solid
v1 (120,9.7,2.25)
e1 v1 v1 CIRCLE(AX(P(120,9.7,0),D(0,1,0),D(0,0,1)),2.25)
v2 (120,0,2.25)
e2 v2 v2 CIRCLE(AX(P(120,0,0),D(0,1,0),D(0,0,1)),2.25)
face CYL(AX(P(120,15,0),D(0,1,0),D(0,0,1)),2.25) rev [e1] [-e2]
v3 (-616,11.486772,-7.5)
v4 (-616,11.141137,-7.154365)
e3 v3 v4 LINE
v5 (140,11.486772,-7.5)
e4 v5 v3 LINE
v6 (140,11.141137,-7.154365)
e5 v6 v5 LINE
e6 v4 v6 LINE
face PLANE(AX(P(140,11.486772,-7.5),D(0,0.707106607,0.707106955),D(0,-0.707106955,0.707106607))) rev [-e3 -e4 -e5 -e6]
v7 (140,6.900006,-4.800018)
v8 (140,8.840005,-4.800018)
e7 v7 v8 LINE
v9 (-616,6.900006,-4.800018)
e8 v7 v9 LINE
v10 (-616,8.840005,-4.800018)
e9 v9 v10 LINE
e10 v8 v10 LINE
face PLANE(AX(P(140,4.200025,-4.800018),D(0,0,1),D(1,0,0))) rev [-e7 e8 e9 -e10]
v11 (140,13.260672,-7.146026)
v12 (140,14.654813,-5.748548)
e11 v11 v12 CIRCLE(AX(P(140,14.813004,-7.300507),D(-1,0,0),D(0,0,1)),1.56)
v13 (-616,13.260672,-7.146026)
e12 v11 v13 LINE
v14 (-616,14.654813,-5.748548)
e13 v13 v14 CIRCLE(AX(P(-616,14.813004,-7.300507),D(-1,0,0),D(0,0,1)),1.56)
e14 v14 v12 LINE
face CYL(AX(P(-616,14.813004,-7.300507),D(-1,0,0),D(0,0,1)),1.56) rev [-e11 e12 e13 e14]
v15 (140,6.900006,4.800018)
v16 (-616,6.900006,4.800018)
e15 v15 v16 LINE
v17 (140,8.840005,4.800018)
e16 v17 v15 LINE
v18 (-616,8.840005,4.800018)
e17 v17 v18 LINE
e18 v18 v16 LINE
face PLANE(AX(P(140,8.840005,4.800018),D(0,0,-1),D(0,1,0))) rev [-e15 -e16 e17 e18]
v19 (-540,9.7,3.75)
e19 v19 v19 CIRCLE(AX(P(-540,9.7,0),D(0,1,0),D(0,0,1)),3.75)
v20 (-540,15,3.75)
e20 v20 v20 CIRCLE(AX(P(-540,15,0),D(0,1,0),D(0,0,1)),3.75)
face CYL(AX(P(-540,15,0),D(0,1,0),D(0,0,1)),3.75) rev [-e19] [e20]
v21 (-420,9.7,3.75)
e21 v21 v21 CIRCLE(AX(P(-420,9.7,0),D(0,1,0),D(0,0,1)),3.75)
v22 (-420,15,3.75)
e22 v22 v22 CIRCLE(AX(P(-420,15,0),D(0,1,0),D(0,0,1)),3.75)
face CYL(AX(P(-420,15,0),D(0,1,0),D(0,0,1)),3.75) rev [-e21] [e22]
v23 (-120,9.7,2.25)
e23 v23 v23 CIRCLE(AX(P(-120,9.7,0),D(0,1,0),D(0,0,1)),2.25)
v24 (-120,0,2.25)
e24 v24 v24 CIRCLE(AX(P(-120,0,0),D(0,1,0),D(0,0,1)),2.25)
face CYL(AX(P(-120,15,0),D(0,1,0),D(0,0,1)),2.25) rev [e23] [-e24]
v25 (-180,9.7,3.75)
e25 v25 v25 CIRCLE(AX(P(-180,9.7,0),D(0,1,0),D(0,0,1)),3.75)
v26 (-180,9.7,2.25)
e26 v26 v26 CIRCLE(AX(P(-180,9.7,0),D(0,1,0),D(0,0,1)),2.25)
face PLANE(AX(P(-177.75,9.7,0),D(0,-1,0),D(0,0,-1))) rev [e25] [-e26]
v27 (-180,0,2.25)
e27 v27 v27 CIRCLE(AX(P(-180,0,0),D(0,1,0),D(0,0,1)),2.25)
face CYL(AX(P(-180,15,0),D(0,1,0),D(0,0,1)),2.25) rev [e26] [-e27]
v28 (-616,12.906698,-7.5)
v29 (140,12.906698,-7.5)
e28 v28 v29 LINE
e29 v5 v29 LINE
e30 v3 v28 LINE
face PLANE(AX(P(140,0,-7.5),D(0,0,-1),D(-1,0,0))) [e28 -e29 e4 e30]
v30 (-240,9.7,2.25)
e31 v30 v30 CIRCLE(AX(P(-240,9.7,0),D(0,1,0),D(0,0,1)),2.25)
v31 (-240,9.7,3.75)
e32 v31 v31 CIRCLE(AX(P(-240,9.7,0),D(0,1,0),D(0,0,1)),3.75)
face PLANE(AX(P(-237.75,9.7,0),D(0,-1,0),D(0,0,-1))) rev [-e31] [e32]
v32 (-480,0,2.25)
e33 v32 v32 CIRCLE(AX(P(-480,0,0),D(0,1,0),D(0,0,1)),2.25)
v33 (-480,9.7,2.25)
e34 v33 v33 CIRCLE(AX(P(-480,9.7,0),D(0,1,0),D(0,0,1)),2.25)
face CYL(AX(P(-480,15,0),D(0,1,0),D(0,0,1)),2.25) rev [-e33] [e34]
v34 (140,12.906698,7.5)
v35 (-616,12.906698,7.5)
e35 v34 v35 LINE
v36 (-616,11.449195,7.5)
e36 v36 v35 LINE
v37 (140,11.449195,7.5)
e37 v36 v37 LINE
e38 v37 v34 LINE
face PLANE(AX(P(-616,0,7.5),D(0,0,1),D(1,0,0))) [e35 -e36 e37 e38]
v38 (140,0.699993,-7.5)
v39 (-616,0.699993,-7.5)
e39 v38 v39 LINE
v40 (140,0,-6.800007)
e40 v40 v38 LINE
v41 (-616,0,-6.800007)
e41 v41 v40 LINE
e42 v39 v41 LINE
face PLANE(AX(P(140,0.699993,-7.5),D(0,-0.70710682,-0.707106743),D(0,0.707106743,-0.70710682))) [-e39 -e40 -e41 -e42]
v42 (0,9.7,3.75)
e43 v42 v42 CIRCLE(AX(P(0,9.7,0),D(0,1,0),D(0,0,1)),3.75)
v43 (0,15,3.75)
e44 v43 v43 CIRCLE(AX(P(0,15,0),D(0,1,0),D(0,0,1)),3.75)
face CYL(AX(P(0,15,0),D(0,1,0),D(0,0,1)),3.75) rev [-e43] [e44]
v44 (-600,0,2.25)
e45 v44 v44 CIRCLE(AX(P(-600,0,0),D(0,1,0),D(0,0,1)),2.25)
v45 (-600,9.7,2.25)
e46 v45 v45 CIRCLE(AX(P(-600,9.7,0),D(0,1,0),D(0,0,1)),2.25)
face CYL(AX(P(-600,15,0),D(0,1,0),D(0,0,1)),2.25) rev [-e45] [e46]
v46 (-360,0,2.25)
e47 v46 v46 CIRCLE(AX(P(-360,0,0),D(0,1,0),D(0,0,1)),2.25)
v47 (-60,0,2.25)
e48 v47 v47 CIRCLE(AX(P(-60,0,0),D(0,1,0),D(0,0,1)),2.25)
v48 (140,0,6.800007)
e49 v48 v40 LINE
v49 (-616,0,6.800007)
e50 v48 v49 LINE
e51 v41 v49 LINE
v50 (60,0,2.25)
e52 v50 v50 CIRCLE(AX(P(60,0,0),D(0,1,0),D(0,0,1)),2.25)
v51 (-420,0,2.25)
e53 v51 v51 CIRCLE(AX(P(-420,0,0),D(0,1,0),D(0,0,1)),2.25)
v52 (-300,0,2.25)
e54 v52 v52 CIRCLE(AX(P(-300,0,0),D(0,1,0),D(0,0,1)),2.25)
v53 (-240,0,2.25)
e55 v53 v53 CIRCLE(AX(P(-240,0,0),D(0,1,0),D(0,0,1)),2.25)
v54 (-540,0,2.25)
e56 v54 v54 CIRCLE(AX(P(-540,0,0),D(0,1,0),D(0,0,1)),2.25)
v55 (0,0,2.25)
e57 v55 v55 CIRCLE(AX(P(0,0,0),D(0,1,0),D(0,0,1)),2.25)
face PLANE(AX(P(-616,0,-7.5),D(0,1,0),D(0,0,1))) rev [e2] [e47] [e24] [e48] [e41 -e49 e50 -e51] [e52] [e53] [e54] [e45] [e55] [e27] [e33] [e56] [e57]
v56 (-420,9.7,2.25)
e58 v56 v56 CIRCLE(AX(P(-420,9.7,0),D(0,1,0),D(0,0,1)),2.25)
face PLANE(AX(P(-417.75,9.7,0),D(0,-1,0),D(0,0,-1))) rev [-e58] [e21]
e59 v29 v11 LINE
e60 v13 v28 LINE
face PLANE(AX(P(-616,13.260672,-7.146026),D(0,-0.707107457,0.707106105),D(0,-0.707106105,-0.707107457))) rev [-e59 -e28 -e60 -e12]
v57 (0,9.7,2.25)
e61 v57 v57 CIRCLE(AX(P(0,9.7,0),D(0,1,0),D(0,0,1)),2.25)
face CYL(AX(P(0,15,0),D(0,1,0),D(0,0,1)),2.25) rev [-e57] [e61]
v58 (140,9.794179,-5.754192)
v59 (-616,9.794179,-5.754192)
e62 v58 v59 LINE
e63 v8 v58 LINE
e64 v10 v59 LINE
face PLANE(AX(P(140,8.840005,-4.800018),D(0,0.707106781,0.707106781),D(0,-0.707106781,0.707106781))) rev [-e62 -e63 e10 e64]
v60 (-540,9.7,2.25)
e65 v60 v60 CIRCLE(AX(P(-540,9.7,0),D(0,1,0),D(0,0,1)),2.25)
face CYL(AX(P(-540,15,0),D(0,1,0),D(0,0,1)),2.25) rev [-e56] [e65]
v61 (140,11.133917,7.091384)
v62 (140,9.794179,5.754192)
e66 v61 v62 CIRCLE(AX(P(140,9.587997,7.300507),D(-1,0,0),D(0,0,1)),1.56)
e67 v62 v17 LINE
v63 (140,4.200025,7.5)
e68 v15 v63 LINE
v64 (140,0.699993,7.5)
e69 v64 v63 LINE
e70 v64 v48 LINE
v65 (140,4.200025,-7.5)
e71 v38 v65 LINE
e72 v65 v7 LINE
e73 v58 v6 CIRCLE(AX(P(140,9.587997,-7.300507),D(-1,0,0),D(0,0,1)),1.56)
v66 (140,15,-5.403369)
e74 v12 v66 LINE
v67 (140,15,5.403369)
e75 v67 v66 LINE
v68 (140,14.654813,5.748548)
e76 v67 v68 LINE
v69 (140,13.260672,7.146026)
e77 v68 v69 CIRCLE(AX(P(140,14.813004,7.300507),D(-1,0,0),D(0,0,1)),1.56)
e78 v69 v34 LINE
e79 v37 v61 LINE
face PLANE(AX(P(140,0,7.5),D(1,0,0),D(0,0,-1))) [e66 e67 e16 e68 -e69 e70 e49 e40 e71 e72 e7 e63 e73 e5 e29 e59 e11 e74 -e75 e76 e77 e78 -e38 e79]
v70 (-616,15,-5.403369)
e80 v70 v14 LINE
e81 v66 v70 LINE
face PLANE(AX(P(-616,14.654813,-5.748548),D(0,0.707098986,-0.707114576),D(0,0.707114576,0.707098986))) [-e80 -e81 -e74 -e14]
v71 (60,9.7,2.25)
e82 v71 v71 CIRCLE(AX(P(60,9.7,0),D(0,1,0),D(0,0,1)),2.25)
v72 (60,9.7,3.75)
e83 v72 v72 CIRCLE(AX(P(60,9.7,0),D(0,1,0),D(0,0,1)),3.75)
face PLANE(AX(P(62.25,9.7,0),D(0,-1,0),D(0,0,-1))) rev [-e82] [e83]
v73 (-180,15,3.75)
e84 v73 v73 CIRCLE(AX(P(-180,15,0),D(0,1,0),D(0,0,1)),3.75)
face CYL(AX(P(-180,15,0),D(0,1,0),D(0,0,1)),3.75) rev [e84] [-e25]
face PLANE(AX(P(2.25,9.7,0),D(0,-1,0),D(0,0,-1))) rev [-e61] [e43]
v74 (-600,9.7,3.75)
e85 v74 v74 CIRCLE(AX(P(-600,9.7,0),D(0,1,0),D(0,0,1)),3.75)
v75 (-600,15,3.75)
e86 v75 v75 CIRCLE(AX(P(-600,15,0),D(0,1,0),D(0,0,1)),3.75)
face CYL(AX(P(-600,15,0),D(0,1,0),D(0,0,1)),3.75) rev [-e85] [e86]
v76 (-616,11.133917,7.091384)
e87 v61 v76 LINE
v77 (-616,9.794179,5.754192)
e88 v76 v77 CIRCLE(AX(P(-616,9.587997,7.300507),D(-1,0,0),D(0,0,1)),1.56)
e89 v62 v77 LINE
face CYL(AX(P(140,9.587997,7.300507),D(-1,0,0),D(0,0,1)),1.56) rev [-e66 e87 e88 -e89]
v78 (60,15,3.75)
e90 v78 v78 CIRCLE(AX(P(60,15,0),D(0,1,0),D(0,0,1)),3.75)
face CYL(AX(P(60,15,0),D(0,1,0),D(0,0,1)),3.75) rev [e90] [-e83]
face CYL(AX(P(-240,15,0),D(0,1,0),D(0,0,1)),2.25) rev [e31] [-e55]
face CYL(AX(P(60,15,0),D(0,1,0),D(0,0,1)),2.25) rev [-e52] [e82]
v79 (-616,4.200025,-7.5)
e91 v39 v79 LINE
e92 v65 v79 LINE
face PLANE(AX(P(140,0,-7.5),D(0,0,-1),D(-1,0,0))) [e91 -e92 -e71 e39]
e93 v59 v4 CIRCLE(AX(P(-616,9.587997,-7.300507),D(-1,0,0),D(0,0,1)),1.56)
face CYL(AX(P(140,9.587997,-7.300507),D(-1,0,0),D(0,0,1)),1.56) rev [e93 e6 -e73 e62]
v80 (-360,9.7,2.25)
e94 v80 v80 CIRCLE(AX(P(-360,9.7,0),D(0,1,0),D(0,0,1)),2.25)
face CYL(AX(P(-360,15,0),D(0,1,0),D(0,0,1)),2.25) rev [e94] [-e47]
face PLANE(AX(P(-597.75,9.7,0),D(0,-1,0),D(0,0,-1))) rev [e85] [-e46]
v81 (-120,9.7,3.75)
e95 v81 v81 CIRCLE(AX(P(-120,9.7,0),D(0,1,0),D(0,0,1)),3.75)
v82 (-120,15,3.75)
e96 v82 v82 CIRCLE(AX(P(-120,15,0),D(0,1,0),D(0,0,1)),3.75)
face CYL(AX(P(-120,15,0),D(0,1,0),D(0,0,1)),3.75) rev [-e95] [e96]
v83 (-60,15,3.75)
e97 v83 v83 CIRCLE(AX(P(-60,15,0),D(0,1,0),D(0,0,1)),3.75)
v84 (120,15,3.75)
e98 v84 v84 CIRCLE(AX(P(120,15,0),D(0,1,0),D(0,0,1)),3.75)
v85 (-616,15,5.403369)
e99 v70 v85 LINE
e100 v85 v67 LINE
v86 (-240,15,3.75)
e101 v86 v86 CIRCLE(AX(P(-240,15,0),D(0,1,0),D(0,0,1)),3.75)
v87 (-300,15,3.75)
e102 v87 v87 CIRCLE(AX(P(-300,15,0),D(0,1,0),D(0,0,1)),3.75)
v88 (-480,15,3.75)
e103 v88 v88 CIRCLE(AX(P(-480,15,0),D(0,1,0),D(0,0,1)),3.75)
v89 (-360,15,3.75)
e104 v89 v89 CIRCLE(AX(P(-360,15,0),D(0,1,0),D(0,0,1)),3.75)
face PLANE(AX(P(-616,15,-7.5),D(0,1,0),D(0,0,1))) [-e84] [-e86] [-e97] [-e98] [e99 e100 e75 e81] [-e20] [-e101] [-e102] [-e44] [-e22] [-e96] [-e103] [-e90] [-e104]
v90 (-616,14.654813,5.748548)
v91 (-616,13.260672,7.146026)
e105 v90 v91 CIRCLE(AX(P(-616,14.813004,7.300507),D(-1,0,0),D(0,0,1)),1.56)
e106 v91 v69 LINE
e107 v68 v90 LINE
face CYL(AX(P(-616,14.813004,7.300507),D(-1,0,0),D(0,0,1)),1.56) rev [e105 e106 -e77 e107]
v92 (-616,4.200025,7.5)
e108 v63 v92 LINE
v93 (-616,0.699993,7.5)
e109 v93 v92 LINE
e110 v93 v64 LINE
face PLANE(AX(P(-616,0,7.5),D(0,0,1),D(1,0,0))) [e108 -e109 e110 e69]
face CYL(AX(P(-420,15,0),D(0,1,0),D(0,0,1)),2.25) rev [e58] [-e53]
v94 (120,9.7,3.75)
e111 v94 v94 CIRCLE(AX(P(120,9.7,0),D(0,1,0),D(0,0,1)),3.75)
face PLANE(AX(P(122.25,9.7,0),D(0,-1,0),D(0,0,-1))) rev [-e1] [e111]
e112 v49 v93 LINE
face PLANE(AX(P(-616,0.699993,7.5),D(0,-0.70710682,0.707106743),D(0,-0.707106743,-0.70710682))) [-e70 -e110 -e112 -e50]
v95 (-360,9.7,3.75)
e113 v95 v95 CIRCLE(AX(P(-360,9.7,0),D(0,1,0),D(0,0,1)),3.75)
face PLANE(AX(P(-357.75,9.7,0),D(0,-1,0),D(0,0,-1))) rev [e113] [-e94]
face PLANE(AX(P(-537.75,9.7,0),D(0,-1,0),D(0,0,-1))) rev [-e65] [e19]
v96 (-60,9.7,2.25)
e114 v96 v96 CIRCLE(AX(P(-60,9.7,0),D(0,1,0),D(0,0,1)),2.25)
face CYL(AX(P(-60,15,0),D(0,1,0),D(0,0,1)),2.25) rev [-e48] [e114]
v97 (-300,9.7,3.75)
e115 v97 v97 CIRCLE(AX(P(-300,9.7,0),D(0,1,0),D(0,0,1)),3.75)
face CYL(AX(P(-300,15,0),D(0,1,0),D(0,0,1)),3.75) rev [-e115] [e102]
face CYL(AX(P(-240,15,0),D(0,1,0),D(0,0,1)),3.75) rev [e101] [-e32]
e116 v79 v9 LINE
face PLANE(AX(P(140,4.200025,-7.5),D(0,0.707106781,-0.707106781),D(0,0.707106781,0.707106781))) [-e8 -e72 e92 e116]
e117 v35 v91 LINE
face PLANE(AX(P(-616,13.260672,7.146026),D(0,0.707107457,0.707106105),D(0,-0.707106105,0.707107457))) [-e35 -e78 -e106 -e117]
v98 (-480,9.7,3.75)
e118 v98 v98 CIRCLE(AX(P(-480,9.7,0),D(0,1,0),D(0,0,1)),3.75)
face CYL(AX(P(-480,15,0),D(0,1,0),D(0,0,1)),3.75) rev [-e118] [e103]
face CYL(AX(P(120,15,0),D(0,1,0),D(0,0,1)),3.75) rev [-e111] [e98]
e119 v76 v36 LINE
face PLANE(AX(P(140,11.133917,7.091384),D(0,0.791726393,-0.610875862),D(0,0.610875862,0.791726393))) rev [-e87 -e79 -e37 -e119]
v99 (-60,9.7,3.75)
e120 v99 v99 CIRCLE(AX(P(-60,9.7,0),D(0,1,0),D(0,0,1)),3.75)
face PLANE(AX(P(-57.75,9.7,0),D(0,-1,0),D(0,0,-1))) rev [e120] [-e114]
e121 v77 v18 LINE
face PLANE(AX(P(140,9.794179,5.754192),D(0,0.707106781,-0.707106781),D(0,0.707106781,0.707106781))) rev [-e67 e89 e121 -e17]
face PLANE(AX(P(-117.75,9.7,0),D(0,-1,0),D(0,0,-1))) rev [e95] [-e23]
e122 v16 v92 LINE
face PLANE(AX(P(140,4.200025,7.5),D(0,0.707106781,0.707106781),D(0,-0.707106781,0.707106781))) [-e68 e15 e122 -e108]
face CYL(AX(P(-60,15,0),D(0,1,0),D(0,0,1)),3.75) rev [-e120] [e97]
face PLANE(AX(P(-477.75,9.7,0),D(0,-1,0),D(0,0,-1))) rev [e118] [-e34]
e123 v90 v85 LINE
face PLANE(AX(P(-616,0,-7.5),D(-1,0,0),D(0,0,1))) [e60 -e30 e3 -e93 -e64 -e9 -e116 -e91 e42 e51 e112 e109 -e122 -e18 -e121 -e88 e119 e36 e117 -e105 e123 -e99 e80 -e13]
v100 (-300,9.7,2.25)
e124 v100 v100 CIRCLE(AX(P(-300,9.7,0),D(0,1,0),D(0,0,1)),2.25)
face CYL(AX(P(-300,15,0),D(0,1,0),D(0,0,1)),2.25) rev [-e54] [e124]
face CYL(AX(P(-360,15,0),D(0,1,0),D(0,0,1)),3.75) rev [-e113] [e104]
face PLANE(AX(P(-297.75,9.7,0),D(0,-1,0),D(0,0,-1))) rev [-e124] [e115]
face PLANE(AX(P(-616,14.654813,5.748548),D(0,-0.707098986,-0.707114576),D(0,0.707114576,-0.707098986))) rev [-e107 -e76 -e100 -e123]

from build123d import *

# Parameters (mm, degrees)
SKETCH1_W                                        = 756
SKETCH1_H                                        = 15
BOSS_EXTRUDE1_DEPTH                              = 15
CUT_EXTRUDE1_DEPTH                               = 757.185989027
CUT_EXTRUDE2_DEPTH                               = 757.185989027
DRAFT1_ANGLE                                     = 45
DRAFT2_ANGLE                                     = 45
HOLE1_D                                          = 3.1199998
CBORE_FOR_M4_HEX_HEAD_MACHINE_SCREW1_D           = 4.5
CBORE_FOR_M4_HEX_HEAD_MACHINE_SCREW1_CBORE_D     = 7.5
CBORE_FOR_M4_HEX_HEAD_MACHINE_SCREW1_CBORE_DEPTH = 5.3
CHAMFER1_SIZE                                    = 0.359114068
CHAMFER2_SIZE                                    = 0.351583128
CHAMFER2_SIZE_2                                  = 0.314005893
CHAMFER3_SIZE                                    = 0.348386014
CHAMFER4_SIZE                                    = 0.699992786
CHAMFER4_SIZE2                                   = 0.69999271
CHAMFER5_SIZE                                    = 0.69999271
CHAMFER5_SIZE2                                   = 0.699992786


with BuildPart() as part:
    # Sketch1 → Boss-Extrude1 (new body)
    with BuildSketch(Plane(origin=(0, 15, 0), x_dir=(-1, 0, 0), z_dir=(0, 1, 0))):
        with Locations((238, 0)):
            Rectangle(SKETCH1_W, SKETCH1_H)
    extrude(amount=-BOSS_EXTRUDE1_DEPTH)

    # Sketch2 → Cut-Extrude1 (cut, through all)
    with BuildSketch(Plane.ZY.offset(616)):
        with BuildLine():
            Line((-7.5, 11.135189072), (-7.5, 4.2000246))
            Line((-7.5, 4.2000246), (-4.8000183, 4.2000246))
            Line((-4.8000183, 4.2000246), (-4.8000183, 8.8400054))
            Line((-4.8000183, 8.8400054), (-5.754192018, 9.794179118))
            ThreePointArc((-5.754192018, 9.794179118), (-6.350212567, 10.82514773), (-7.5, 11.135189072))
        make_face()
    extrude(amount=-CUT_EXTRUDE1_DEPTH, mode=Mode.SUBTRACT)

    # Sketch3 → Cut-Extrude2 (cut, through all)
    with BuildSketch(Plane.ZY.offset(616)):
        with BuildLine():
            Line((7.5, 4.2000246), (7.5, 11.135189072))
            ThreePointArc((7.5, 11.135189072), (6.350212567, 10.82514773), (5.754192018, 9.794179118))
            Line((5.754192018, 9.794179118), (4.8000183, 8.8400054))
            Line((4.8000183, 8.8400054), (4.8000183, 4.2000246))
            Line((4.8000183, 4.2000246), (7.5, 4.2000246))
        make_face()
    extrude(amount=-CUT_EXTRUDE2_DEPTH, mode=Mode.SUBTRACT)

    # Draft1
    draft1_faces = [part.faces().sort_by_distance(p)[0] for p in [
        (-238, 4.2000246, -6.15000915),
    ]]
    draft(draft1_faces, Plane(origin=(140, 0, -7.5), x_dir=(-1, 0, 0), z_dir=(0, 0, -1)), DRAFT1_ANGLE)

    # Draft2
    draft2_faces = [part.faces().sort_by_distance(p)[0] for p in [
        (-238, 4.2000246, 6.15000915),
    ]]
    draft(draft2_faces, Plane(origin=(-616, 0, 7.5), x_dir=(1, 0, 0), z_dir=(0, 0, 1)), DRAFT2_ANGLE)

    # Hole1 (through all)
    with Locations(Plane.ZY.offset(616)):
        with Locations((-7.3005066, 14.813004), (7.3005066, 14.813004)):
            Hole(HOLE1_D / 2)

    # CBORE for M4 Hex Head Machine Screw1 (through all)
    with Locations(Plane(origin=(0, 15, 0), x_dir=(-1, 0, 0), z_dir=(0, 1, 0))):
        with Locations((-60, 0), (-120, 0), (0, 0), (60, 0), (120, 0), (180, 0), (240, 0), (300, 0), (360, 0), (420, 0), (480, 0), (540, 0), (600, 0)):
            CounterBoreHole(CBORE_FOR_M4_HEX_HEAD_MACHINE_SCREW1_D / 2, CBORE_FOR_M4_HEX_HEAD_MACHINE_SCREW1_CBORE_D / 2, CBORE_FOR_M4_HEX_HEAD_MACHINE_SCREW1_CBORE_DEPTH)

    # Chamfer1
    # the kernel refuses this chamfer: 0.359114068, 0.320732608 mm, written as the material it takes off along each edge
    with BuildSketch(Plane(origin=(-616.923527515, 13.265812328, 7.5), x_dir=(0, -1, 0), z_dir=(1, 0, 0))) as chamfer1_piece_1:
        with BuildLine():
            Line((CHAMFER1_SIZE * 0.99999999892, 0), (0.005140565, 0.353974179))
            ThreePointArc((0.005140565, 0.353974179), (0.01270895, 0.181894047), (0, 0))
            Line((0, 0), (CHAMFER1_SIZE * 0.99999999892, 0))
        make_face()
    extrude(amount=757.84705503, mode=Mode.SUBTRACT)
    with BuildSketch(Plane(origin=(-616.923527515, 13.265812328, -7.5), x_dir=(0, -0.014520899519340609, 0.9998945661804294), z_dir=(1, 0, 0))) as chamfer1_piece_2:
        with BuildLine():
            Line((0.354011504, 0), (CHAMFER1_SIZE * 0.0145208995037, CHAMFER1_SIZE * 0.999894565101))
            Line((CHAMFER1_SIZE * 0.0145208995037, CHAMFER1_SIZE * 0.999894565101), (0, 0))
            ThreePointArc((0, 0), (0.182059415, 0.010066344), (0.354011504, 0))
        make_face()
    extrude(amount=757.84705503, mode=Mode.SUBTRACT)

    # Chamfer2
    # the kernel refuses this chamfer: 0.351583128, 0.314005893 mm, written as the material it takes off along each edge
    with BuildSketch(Plane(origin=(-616.904160355, 11.135189072, -7.5), x_dir=(0, 0.017205827635516736, 0.9998519687910691), z_dir=(1, 0, 0))) as chamfer2_piece_1:
        with BuildLine():
            Line((0.345686311, 0), (CHAMFER2_SIZE * 0.0172058276427, -CHAMFER2_SIZE * 0.999851969207))
            Line((CHAMFER2_SIZE * 0.0172058276427, -CHAMFER2_SIZE * 0.999851969207), (0, 0))
            ThreePointArc((0, 0), (0.177775336, -0.009597014), (0.345686311, 0))
        make_face()
    extrude(amount=757.808320711, mode=Mode.SUBTRACT)
    with BuildSketch(Plane(origin=(-617.049666566, 11.135189072, 7.5), x_dir=(0, 1, 0), z_dir=(1, 0, 0))) as chamfer2_piece_2:
        with BuildLine():
            Line((CHAMFER2_SIZE_2 * 0.999999998673, 0), (-0.001272129, -0.408616458))
            ThreePointArc((-0.001272129, -0.408616458), (0.012772883, -0.209994562), (0, 0))
            Line((0, 0), (CHAMFER2_SIZE_2 * 0.999999998673, 0))
        make_face()
    extrude(amount=758.099333132, mode=Mode.SUBTRACT)

    # Chamfer3
    # the kernel refuses this chamfer: 0.348386014, 0.313117398 mm, written as the material it takes off along each edge
    with BuildSketch(Plane(origin=(-616.895938121, 15, 5.751754785), x_dir=(0, 0, -1), z_dir=(1, 0, 0))) as chamfer3_piece_1:
        with BuildLine():
            Line((CHAMFER3_SIZE, 0), (0.003206731, -0.345186893))
            ThreePointArc((0.003206731, -0.345186893), (0.011218763, -0.177431259), (0, 0))
            Line((0, 0), (CHAMFER3_SIZE, 0))
        make_face()
    extrude(amount=757.791876243, mode=Mode.SUBTRACT)
    with BuildSketch(Plane(origin=(-616.895938121, 15, -5.751754785), x_dir=(0, 0, 1), z_dir=(1, 0, 0))) as chamfer3_piece_2:
        with BuildLine():
            Line((CHAMFER3_SIZE, 0), (0.003206731, 0.345186893))
            ThreePointArc((0.003206731, 0.345186893), (0.011218763, 0.177431259), (0, 0))
            Line((0, 0), (CHAMFER3_SIZE, 0))
        make_face()
    extrude(amount=757.791876243, mode=Mode.SUBTRACT)

    # Chamfer4
    chamfer4_edges = [part.edges().sort_by_distance(p)[0] for p in [
        (-238, 0, 7.5),
    ]]
    chamfer4_side = [part.faces().sort_by_distance(p)[0] for p in [
        (-238, 2.1000123, 7.5),
    ]]
    chamfer(chamfer4_edges, length=CHAMFER4_SIZE, length2=CHAMFER4_SIZE2, reference=chamfer4_side[0])

    # Chamfer5
    chamfer5_edges = [part.edges().sort_by_distance(p)[0] for p in [
        (-238, 0, -7.5),
    ]]
    chamfer5_side = [part.faces().sort_by_distance(p)[0] for p in [
        (-608.438647672, 0, -0.349996355),
    ]]
    chamfer(chamfer5_edges, length=CHAMFER5_SIZE, length2=CHAMFER5_SIZE2, reference=chamfer5_side[0])


solid = part.part
